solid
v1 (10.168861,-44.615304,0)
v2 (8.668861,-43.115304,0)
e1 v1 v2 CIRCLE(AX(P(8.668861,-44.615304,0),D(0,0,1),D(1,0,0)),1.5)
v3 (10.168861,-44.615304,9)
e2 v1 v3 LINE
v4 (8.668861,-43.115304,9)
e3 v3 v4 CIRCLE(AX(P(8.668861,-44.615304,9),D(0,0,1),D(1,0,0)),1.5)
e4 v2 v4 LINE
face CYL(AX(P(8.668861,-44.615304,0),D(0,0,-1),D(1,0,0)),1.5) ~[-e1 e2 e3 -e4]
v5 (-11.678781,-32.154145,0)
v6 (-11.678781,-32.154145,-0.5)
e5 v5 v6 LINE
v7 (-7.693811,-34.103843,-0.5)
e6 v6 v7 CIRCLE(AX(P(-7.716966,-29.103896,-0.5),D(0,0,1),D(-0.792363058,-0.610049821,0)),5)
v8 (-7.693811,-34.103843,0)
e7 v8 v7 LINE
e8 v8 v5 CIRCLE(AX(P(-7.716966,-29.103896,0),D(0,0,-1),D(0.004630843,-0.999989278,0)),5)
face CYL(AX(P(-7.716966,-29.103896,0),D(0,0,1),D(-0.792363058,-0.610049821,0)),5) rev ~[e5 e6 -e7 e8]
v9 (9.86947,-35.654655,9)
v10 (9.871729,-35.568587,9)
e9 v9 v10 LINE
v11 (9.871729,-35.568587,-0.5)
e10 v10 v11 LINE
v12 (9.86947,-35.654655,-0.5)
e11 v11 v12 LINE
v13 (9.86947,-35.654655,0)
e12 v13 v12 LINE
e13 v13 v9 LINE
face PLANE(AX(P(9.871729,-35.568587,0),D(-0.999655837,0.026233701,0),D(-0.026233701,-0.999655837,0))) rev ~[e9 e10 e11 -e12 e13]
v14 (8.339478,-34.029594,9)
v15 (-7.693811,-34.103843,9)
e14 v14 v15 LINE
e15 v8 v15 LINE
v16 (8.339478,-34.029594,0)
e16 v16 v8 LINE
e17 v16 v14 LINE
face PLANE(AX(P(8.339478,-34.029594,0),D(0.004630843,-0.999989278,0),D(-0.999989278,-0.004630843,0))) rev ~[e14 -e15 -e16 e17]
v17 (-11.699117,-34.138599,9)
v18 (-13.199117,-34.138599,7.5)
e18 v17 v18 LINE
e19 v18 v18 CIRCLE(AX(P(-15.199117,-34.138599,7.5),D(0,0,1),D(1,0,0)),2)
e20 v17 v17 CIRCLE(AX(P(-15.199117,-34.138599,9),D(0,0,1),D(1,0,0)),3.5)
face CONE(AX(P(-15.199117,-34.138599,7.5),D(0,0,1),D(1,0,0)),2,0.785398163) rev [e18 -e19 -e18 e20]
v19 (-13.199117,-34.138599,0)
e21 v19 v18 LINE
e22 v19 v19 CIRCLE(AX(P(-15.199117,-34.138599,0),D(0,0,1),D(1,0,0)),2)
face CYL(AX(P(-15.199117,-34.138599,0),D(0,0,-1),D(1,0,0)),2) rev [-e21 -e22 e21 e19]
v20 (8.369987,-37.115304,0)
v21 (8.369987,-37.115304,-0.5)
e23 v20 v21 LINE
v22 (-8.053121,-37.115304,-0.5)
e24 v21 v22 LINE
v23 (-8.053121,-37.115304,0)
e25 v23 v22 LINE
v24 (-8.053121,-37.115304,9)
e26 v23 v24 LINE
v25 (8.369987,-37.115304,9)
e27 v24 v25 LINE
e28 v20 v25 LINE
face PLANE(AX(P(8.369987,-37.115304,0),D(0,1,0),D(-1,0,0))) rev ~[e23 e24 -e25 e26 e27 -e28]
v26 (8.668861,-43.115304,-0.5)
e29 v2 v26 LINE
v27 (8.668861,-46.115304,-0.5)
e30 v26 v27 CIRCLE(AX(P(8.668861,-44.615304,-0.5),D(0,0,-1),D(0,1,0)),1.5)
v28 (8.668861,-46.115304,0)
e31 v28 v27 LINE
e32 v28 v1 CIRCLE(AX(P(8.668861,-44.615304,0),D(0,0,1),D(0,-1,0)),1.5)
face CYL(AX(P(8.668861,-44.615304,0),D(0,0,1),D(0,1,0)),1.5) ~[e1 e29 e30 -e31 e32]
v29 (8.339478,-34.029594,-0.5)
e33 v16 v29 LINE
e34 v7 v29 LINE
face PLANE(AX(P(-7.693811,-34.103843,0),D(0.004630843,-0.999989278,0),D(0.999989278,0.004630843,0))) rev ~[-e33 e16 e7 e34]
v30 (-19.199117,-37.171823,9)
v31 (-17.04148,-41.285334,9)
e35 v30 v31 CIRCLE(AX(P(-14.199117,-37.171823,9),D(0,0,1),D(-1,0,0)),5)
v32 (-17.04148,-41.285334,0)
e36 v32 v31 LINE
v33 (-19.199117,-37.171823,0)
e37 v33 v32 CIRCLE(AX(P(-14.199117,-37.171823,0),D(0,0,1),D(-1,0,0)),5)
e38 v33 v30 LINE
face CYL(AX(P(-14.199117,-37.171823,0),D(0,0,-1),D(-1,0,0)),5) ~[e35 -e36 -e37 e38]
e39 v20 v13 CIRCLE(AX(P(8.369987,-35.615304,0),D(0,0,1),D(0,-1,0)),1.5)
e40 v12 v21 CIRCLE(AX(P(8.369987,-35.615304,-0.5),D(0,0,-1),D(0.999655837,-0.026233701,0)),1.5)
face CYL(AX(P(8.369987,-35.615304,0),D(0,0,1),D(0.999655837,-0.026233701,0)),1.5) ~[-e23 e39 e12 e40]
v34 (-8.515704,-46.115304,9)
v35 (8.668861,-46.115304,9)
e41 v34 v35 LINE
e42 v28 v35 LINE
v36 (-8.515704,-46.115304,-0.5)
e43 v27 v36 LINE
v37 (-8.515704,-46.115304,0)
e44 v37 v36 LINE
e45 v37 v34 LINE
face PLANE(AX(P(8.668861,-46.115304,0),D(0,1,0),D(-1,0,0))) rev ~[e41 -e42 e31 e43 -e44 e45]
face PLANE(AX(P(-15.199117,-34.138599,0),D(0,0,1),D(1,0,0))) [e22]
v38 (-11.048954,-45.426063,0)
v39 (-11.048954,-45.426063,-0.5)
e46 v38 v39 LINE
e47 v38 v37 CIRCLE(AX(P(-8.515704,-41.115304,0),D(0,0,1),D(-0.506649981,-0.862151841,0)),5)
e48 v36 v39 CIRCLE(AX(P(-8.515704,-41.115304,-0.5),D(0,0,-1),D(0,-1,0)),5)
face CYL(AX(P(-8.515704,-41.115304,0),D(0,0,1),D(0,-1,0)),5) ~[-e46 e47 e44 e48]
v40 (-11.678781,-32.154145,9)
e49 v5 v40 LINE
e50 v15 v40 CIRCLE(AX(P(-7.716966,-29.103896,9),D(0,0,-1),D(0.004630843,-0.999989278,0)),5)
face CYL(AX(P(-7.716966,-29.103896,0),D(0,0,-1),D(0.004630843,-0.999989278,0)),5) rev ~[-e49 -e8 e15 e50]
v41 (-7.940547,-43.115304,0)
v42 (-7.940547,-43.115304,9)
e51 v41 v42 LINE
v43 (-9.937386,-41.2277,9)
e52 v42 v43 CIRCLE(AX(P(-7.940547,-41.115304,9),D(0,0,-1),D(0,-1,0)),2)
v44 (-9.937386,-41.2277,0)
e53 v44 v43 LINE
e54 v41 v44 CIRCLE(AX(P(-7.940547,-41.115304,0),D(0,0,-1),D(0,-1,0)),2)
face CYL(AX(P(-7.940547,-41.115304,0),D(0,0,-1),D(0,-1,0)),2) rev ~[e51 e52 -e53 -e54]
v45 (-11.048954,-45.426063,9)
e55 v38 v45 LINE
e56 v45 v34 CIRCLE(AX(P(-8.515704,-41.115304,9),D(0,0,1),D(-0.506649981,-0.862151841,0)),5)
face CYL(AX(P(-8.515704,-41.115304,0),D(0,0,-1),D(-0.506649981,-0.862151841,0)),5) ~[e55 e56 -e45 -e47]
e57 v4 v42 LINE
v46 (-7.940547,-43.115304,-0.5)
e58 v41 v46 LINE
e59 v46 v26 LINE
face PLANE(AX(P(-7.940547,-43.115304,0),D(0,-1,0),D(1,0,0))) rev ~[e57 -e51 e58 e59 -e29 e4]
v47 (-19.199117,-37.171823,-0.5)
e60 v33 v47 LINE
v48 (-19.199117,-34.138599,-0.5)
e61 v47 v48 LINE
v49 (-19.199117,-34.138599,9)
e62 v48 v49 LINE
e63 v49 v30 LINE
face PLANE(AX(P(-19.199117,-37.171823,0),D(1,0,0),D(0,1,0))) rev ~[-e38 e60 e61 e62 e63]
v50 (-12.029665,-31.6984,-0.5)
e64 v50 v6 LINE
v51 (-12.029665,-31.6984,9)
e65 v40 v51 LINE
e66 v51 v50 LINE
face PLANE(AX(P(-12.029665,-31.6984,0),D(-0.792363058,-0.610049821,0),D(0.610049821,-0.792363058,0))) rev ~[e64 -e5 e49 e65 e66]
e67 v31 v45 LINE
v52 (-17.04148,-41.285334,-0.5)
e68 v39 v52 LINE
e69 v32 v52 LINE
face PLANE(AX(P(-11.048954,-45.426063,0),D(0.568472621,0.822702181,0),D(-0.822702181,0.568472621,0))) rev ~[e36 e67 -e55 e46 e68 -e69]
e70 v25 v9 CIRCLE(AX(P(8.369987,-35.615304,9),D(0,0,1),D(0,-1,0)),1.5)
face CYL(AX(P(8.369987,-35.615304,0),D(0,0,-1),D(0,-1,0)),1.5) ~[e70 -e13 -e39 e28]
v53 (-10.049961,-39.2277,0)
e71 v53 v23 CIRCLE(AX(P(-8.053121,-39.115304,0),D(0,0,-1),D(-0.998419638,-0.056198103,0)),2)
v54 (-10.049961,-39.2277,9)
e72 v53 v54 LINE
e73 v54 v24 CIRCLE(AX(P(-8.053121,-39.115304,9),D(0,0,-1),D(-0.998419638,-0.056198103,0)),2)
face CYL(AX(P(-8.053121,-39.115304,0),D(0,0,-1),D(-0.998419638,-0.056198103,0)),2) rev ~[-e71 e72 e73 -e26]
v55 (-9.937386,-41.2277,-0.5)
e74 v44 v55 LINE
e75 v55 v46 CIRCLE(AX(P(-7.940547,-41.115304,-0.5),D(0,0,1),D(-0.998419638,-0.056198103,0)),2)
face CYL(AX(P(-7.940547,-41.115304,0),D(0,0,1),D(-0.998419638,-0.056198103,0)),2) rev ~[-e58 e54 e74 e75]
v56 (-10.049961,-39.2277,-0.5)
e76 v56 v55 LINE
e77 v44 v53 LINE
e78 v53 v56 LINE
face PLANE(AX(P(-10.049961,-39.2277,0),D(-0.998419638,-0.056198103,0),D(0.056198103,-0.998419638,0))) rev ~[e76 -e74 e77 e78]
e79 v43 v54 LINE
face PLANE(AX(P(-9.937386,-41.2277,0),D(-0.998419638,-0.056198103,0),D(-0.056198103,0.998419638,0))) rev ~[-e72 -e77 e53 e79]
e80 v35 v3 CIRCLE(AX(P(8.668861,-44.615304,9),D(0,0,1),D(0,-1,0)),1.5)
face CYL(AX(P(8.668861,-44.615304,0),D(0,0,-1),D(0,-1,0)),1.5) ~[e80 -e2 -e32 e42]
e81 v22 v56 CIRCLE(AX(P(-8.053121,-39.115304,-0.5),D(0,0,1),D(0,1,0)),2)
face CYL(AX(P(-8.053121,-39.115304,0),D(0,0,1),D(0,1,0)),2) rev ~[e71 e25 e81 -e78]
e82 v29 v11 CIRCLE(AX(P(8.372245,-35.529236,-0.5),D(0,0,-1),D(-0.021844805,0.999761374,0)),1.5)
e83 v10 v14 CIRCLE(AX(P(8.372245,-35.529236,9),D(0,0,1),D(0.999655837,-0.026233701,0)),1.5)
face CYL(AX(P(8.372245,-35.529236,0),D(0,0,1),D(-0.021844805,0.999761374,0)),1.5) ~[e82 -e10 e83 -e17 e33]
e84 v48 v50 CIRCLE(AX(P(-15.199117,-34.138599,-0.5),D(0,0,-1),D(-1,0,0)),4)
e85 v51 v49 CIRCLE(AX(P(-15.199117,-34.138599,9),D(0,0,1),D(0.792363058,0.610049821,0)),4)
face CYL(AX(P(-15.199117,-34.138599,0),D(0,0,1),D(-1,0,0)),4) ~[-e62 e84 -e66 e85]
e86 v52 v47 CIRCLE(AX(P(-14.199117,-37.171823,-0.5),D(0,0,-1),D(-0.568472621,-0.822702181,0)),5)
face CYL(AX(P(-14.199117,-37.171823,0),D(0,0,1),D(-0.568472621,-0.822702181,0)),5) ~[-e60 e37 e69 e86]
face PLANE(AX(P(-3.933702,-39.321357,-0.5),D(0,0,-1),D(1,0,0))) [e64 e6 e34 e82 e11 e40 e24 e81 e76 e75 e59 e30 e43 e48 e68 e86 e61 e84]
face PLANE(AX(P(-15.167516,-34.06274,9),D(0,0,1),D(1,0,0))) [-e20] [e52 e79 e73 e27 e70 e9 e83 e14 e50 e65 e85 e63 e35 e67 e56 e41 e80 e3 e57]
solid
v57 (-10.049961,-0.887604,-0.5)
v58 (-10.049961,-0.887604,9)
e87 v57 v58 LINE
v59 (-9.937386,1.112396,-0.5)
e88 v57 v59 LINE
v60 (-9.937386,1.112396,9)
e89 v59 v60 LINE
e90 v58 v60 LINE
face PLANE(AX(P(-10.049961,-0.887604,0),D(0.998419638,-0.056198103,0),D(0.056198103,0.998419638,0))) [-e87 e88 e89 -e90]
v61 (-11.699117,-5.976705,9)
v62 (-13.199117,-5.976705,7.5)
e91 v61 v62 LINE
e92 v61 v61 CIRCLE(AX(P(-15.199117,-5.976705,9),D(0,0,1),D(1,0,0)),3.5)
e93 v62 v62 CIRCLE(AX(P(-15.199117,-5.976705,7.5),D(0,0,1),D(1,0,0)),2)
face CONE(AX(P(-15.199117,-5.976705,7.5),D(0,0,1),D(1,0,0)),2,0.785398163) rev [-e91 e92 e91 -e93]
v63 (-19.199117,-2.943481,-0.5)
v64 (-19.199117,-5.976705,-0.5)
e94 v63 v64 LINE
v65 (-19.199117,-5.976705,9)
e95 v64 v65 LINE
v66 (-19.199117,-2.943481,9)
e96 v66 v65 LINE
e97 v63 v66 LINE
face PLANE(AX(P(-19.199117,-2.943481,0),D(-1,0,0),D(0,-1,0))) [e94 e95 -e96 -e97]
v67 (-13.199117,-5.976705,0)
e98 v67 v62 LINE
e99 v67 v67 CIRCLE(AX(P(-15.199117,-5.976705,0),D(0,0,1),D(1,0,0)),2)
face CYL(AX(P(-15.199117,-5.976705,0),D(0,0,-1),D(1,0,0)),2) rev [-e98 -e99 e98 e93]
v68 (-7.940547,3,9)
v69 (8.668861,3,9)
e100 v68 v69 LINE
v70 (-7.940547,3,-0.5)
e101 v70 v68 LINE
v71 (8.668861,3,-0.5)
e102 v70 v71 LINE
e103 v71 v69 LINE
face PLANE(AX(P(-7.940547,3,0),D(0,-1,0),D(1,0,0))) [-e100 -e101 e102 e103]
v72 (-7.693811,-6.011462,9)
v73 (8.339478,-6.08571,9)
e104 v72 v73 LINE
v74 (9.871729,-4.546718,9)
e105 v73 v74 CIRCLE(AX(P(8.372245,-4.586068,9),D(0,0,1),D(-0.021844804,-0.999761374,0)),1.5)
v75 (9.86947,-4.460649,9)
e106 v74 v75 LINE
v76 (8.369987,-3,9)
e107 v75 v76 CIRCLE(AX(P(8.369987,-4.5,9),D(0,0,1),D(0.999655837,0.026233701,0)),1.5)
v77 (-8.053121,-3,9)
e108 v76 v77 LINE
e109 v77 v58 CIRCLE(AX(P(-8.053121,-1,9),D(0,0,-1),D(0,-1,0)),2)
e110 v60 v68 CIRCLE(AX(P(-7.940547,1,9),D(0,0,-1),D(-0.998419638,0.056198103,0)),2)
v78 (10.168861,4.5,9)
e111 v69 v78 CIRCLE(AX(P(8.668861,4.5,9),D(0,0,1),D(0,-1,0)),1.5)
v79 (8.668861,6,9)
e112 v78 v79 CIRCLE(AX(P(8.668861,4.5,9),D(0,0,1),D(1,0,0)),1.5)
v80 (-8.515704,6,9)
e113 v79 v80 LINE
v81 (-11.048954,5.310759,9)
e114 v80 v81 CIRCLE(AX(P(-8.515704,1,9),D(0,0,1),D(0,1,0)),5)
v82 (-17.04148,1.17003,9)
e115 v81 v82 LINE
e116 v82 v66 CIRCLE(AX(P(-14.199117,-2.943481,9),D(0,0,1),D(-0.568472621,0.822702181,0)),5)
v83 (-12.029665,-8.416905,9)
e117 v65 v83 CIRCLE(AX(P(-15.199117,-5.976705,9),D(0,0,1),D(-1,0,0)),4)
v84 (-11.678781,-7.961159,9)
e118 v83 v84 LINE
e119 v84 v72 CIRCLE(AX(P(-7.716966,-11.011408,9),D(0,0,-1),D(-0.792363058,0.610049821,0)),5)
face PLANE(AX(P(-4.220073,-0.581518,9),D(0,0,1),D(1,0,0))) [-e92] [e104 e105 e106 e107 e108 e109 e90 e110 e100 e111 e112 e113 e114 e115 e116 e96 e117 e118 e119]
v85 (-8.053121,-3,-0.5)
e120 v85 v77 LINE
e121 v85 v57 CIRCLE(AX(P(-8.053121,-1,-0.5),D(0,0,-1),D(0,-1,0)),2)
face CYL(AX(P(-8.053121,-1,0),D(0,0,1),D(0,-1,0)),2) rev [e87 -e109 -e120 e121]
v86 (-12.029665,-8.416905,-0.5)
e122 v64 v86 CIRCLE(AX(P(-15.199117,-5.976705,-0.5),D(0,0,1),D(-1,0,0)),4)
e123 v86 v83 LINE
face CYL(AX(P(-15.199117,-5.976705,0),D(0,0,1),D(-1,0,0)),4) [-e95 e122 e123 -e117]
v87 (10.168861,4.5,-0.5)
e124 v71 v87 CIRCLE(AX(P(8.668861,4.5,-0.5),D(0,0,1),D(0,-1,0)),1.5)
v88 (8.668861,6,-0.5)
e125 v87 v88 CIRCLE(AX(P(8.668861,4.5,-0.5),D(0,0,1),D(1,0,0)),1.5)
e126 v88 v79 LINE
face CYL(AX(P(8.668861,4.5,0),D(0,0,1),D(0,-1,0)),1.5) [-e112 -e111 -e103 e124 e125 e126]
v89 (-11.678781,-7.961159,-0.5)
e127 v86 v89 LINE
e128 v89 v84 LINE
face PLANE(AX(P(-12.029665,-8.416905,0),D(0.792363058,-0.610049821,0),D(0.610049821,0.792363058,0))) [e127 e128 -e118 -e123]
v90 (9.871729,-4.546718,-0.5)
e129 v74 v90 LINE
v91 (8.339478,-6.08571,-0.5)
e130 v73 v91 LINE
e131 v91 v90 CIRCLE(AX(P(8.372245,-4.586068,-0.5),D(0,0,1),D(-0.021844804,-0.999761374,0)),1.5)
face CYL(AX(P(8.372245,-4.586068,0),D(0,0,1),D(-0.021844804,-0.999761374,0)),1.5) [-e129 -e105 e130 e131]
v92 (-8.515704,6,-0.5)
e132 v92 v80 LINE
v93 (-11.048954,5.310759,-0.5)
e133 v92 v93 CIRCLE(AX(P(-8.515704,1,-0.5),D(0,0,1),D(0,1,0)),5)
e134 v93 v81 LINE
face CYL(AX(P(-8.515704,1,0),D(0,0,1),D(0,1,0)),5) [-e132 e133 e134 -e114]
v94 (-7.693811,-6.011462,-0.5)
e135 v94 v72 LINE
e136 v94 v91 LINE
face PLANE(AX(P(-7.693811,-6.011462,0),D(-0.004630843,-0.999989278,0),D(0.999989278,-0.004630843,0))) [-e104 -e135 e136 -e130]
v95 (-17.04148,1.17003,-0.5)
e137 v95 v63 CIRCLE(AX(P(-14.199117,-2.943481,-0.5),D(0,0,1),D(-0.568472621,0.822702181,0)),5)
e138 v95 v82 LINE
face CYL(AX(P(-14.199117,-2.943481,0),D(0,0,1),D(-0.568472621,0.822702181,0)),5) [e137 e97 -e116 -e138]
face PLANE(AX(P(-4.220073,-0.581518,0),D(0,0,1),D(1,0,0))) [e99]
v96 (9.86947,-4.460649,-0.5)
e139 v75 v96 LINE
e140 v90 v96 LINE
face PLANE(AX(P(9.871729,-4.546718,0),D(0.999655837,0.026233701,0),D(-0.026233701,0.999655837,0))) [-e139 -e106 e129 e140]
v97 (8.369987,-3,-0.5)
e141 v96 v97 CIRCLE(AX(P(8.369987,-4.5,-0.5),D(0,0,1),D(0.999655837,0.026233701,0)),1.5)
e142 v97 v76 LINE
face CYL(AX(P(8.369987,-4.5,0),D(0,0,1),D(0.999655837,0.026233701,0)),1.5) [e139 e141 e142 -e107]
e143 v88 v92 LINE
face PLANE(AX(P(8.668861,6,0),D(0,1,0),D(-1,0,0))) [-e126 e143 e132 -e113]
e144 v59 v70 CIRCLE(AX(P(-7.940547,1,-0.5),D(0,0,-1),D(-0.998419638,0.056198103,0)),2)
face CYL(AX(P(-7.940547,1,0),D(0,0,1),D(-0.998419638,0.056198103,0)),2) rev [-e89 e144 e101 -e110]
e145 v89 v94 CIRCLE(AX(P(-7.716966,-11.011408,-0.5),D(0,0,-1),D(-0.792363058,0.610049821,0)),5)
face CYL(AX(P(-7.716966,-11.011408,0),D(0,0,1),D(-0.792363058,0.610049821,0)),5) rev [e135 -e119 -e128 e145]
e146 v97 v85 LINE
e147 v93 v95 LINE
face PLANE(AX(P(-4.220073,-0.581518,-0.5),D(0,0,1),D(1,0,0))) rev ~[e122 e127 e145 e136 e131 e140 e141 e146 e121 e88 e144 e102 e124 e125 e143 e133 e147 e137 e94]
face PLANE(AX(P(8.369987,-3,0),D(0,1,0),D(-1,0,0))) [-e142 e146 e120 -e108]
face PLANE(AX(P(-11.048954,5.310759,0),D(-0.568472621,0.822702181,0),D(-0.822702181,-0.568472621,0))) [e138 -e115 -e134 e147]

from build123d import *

# Parameters (mm, degrees)
F0_R      = 2
F1_DEPTH  = 9
F2_DEPTH  = 0.5
F1_FACE_R = 2
F3_DEPTH  = 0.5
F4_SIZE   = 1.5
F4_2_SIZE = 1.5


# Not quite as in the source:
# - a feature names something its author has since deleted; it is built from what else it names


with BuildPart() as f1:
    # F0 (on Top) → F1 (new body)
    with BuildSketch(Plane.XY):
        with BuildLine():
            ThreePointArc((9.8694702636, -4.4606494482), (9.4166416974, -3.4255173739), (8.3699865077, -3))
            Line((8.3699865077, -3), (-8.0531213294, -3))
            ThreePointArc((-8.0531213294, -3), (-9.5065298079, -2.3739009406), (-10.0499606051, -0.8876037946))
            Line((-10.0499606051, -0.8876037946), (-9.9373864918, 1.1123962054))
            ThreePointArc((-9.9373864918, 1.1123962054), (-9.3144481567, 2.4534084785), (-7.9405472161, 3))
            Line((-7.9405472161, 3), (8.6688611699, 3))
            ThreePointArc((8.6688611699, 3), (9.7295213417, 3.4393398282), (10.1688611699, 4.5))
            ThreePointArc((10.1688611699, 4.5), (9.7295213417, 5.5606601718), (8.6688611699, 6))
            Line((8.6688611699, 6), (-8.5157040276, 6))
            ThreePointArc((-8.5157040276, 6), (-9.8283738232, 5.8246137677), (-11.0489539349, 5.3107592031))
            Line((-11.0489539349, 5.3107592031), (-17.0414804275, 1.1700296424))
            ThreePointArc((-17.0414804275, 1.1700296424), (-18.6269732101, -0.6209627525), (-19.1991173223, -2.9434812642))
            Line((-19.1991173223, -2.9434812642), (-19.1991173223, -5.9767054254))
            ThreePointArc((-19.1991173223, -5.9767054254), (-15.1991173223, -1.9767054254), (-11.1991173223, -5.9767054254))
            ThreePointArc((-11.1991173223, -5.9767054254), (-11.4124427302, -7.2655403775), (-12.0296650891, -8.4169047086))
            Line((-12.0296650891, -8.4169047086), (-11.6787809816, -7.9611589727))
            ThreePointArc((-11.6787809816, -7.9611589727), (-9.9143715805, -6.5201490824), (-7.6938114768, -6.0114616886))
            Line((-7.6938114768, -6.0114616886), (8.3394779622, -6.0857101255))
            ThreePointArc((8.3394779622, -6.0857101255), (9.4352310222, -5.6443974444), (9.8717289248, -4.5467175129))
            Line((9.8717289248, -4.5467175129), (9.8694702636, -4.4606494482))
        make_face()
        with BuildLine():
            ThreePointArc((-19.1991173223, -5.9767054254), (-16.4879522743, -9.7633800175), (-12.0296650891, -8.4169047086))
            ThreePointArc((-12.0296650891, -8.4169047086), (-11.4124427302, -7.2655403775), (-11.1991173223, -5.9767054254))
            ThreePointArc((-11.1991173223, -5.9767054254), (-15.1991173223, -1.9767054254), (-19.1991173223, -5.9767054254))
        make_face()
        with Locations((-15.1991173223, -5.9767054254)):
            Circle(F0_R, mode=Mode.SUBTRACT)
    extrude(amount=F1_DEPTH)

    # F0 (on Top) → F2 (join)
    with BuildSketch(Plane.XY):
        with BuildLine():
            ThreePointArc((9.8694702636, -4.4606494482), (9.4166416974, -3.4255173739), (8.3699865077, -3))
            Line((8.3699865077, -3), (-8.0531213294, -3))
            ThreePointArc((-8.0531213294, -3), (-9.5065298079, -2.3739009406), (-10.0499606051, -0.8876037946))
            Line((-10.0499606051, -0.8876037946), (-9.9373864918, 1.1123962054))
            ThreePointArc((-9.9373864918, 1.1123962054), (-9.3144481567, 2.4534084785), (-7.9405472161, 3))
            Line((-7.9405472161, 3), (8.6688611699, 3))
            ThreePointArc((8.6688611699, 3), (9.7295213417, 3.4393398282), (10.1688611699, 4.5))
            ThreePointArc((10.1688611699, 4.5), (9.7295213417, 5.5606601718), (8.6688611699, 6))
            Line((8.6688611699, 6), (-8.5157040276, 6))
            ThreePointArc((-8.5157040276, 6), (-9.8283738232, 5.8246137677), (-11.0489539349, 5.3107592031))
            Line((-11.0489539349, 5.3107592031), (-17.0414804275, 1.1700296424))
            ThreePointArc((-17.0414804275, 1.1700296424), (-18.6269732101, -0.6209627525), (-19.1991173223, -2.9434812642))
            Line((-19.1991173223, -2.9434812642), (-19.1991173223, -5.9767054254))
            ThreePointArc((-19.1991173223, -5.9767054254), (-15.1991173223, -1.9767054254), (-11.1991173223, -5.9767054254))
            ThreePointArc((-11.1991173223, -5.9767054254), (-11.4124427302, -7.2655403775), (-12.0296650891, -8.4169047086))
            Line((-12.0296650891, -8.4169047086), (-11.6787809816, -7.9611589727))
            ThreePointArc((-11.6787809816, -7.9611589727), (-9.9143715805, -6.5201490824), (-7.6938114768, -6.0114616886))
            Line((-7.6938114768, -6.0114616886), (8.3394779622, -6.0857101255))
            ThreePointArc((8.3394779622, -6.0857101255), (9.4352310222, -5.6443974444), (9.8717289248, -4.5467175129))
            Line((9.8717289248, -4.5467175129), (9.8694702636, -4.4606494482))
        make_face()
        with BuildLine():
            ThreePointArc((-19.1991173223, -5.9767054254), (-16.4879522743, -9.7633800175), (-12.0296650891, -8.4169047086))
            ThreePointArc((-12.0296650891, -8.4169047086), (-11.4124427302, -7.2655403775), (-11.1991173223, -5.9767054254))
            ThreePointArc((-11.1991173223, -5.9767054254), (-15.1991173223, -1.9767054254), (-19.1991173223, -5.9767054254))
        make_face()
        with Locations((-15.1991173223, -5.9767054254)):
            Circle(F0_R, mode=Mode.SUBTRACT)
        with Locations((-15.1991173223, -5.9767054254)):
            Circle(F0_R)
    extrude(amount=-F2_DEPTH)

    # F4
    f4_edges = [f1.edges().sort_by_distance(p)[0] for p in [
        (-17.199117, -5.976705, 9),
    ]]
    chamfer(f4_edges, length=F4_SIZE)


with BuildPart() as f1b:
    # F0 (on Top) → F1, piece 2 (new body)
    with BuildSketch(Plane.XY):
        with BuildLine():
            ThreePointArc((-19.1991173223, -34.1385988658), (-15.1991173223, -38.1385988658), (-11.1991173223, -34.1385988658))
            ThreePointArc((-11.1991173223, -34.1385988658), (-11.4124427302, -32.8497639138), (-12.0296650891, -31.6983995827))
            ThreePointArc((-12.0296650891, -31.6983995827), (-16.4879522743, -30.3519242737), (-19.1991173223, -34.1385988658))
        make_face()
        with Locations((-15.1991173223, -34.1385988658)):
            Circle(F0_R, mode=Mode.SUBTRACT)
        with BuildLine():
            ThreePointArc((-12.0296650891, -31.6983995827), (-11.4124427302, -32.8497639138), (-11.1991173223, -34.1385988658))
            ThreePointArc((-11.1991173223, -34.1385988658), (-15.1991173223, -38.1385988658), (-19.1991173223, -34.1385988658))
            Line((-19.1991173223, -34.1385988658), (-19.1991173223, -37.1718230271))
            ThreePointArc((-19.1991173223, -37.1718230271), (-18.6269732101, -39.4943415388), (-17.0414804275, -41.2853339337))
            Line((-17.0414804275, -41.2853339337), (-11.0489539349, -45.4260634944))
            ThreePointArc((-11.0489539349, -45.4260634944), (-9.8283738232, -45.939918059), (-8.5157040276, -46.1153042912))
            Line((-8.5157040276, -46.1153042912), (8.6688611699, -46.1153042912))
            ThreePointArc((8.6688611699, -46.1153042912), (9.7295213417, -45.675964463), (10.1688611699, -44.6153042912))
            ThreePointArc((10.1688611699, -44.6153042912), (9.7295213417, -43.5546441195), (8.6688611699, -43.1153042912))
            Line((8.6688611699, -43.1153042912), (-7.9405472161, -43.1153042912))
            ThreePointArc((-7.9405472161, -43.1153042912), (-9.3144481567, -42.5687127698), (-9.9373864918, -41.2277004967))
            Line((-9.9373864918, -41.2277004967), (-10.0499606051, -39.2277004967))
            ThreePointArc((-10.0499606051, -39.2277004967), (-9.5065298079, -37.7414033506), (-8.0531213294, -37.1153042912))
            Line((-8.0531213294, -37.1153042912), (8.3699865077, -37.1153042912))
            ThreePointArc((8.3699865077, -37.1153042912), (9.4166416974, -36.6897869174), (9.8694702636, -35.6546548431))
            Line((9.8694702636, -35.6546548431), (9.8717289248, -35.5685867783))
            ThreePointArc((9.8717289248, -35.5685867783), (9.4352310222, -34.4709068468), (8.3394779622, -34.0295941658))
            Line((8.3394779622, -34.0295941658), (-7.6938114768, -34.1038426026))
            ThreePointArc((-7.6938114768, -34.1038426026), (-9.9143715805, -33.5951552089), (-11.6787809816, -32.1541453186))
            Line((-11.6787809816, -32.1541453186), (-12.0296650891, -31.6983995827))
        make_face()
    extrude(amount=F1_DEPTH)

    # F1_face (on face) + F0 (on Top) → F3 (join)
    with BuildSketch(Plane(origin=(-6.3231284522, -38.9885454206, 0), x_dir=(1, 0, 0), z_dir=(0, 0, -1))):
        with BuildLine():
            ThreePointArc((-12.8759888701, -4.8499465548), (-10.1648238221, -8.6366211469), (-5.7065366369, -7.2901458379))
            Line((-5.7065366369, -7.2901458379), (-5.3556525294, -6.834400102))
            ThreePointArc((-5.3556525294, -6.834400102), (-3.5912431283, -5.3933902117), (-1.3706830246, -4.8847028179))
            Line((-1.3706830246, -4.8847028179), (14.6626064144, -4.9589512548))
            ThreePointArc((14.6626064144, -4.9589512548), (15.7583594744, -4.5176385738), (16.194857377, -3.4199586423))
            Line((16.194857377, -3.4199586423), (16.1925987158, -3.3338905775))
            ThreePointArc((16.1925987158, -3.3338905775), (15.7397701496, -2.2987585032), (14.6931149599, -1.8732411293))
            Line((14.6931149599, -1.8732411293), (-1.7299928771, -1.8732411293))
            ThreePointArc((-1.7299928771, -1.8732411293), (-3.1834013556, -1.2471420699), (-3.7268321528, 0.2391550761))
            Line((-3.7268321528, 0.2391550761), (-3.6142580396, 2.2391550761))
            ThreePointArc((-3.6142580396, 2.2391550761), (-2.9913197045, 3.5801673492), (-1.6174187638, 4.1267588707))
            Line((-1.6174187638, 4.1267588707), (14.9919896221, 4.1267588707))
            ThreePointArc((14.9919896221, 4.1267588707), (16.4919896221, 5.6267588707), (14.9919896221, 7.1267588707))
            Line((14.9919896221, 7.1267588707), (-2.1925755754, 7.1267588707))
            ThreePointArc((-2.1925755754, 7.1267588707), (-3.5052453709, 6.9513726384), (-4.7258254826, 6.4375180738))
            Line((-4.7258254826, 6.4375180738), (-10.7183519752, 2.2967885131))
            ThreePointArc((-10.7183519752, 2.2967885131), (-12.3038447579, 0.5057961182), (-12.8759888701, -1.8167223935))
            Line((-12.8759888701, -1.8167223935), (-12.8759888701, -4.8499465548))
        make_face()
        with Locations((-8.8759888701, -4.8499465548)):
            Circle(F1_FACE_R, mode=Mode.SUBTRACT)
    with BuildSketch(Plane.XY):
        with Locations((-15.1991173223, -34.1385988658)):
            Circle(F0_R)
    extrude(amount=F3_DEPTH, dir=(0, 0, -1))

    # F4#2
    f4_2_edges = [f1b.edges().sort_by_distance(p)[0] for p in [
        (-17.199117, -34.138599, 9),
    ]]
    chamfer(f4_2_edges, length=F4_2_SIZE)


solid = Compound([f1.part, f1b.part])
